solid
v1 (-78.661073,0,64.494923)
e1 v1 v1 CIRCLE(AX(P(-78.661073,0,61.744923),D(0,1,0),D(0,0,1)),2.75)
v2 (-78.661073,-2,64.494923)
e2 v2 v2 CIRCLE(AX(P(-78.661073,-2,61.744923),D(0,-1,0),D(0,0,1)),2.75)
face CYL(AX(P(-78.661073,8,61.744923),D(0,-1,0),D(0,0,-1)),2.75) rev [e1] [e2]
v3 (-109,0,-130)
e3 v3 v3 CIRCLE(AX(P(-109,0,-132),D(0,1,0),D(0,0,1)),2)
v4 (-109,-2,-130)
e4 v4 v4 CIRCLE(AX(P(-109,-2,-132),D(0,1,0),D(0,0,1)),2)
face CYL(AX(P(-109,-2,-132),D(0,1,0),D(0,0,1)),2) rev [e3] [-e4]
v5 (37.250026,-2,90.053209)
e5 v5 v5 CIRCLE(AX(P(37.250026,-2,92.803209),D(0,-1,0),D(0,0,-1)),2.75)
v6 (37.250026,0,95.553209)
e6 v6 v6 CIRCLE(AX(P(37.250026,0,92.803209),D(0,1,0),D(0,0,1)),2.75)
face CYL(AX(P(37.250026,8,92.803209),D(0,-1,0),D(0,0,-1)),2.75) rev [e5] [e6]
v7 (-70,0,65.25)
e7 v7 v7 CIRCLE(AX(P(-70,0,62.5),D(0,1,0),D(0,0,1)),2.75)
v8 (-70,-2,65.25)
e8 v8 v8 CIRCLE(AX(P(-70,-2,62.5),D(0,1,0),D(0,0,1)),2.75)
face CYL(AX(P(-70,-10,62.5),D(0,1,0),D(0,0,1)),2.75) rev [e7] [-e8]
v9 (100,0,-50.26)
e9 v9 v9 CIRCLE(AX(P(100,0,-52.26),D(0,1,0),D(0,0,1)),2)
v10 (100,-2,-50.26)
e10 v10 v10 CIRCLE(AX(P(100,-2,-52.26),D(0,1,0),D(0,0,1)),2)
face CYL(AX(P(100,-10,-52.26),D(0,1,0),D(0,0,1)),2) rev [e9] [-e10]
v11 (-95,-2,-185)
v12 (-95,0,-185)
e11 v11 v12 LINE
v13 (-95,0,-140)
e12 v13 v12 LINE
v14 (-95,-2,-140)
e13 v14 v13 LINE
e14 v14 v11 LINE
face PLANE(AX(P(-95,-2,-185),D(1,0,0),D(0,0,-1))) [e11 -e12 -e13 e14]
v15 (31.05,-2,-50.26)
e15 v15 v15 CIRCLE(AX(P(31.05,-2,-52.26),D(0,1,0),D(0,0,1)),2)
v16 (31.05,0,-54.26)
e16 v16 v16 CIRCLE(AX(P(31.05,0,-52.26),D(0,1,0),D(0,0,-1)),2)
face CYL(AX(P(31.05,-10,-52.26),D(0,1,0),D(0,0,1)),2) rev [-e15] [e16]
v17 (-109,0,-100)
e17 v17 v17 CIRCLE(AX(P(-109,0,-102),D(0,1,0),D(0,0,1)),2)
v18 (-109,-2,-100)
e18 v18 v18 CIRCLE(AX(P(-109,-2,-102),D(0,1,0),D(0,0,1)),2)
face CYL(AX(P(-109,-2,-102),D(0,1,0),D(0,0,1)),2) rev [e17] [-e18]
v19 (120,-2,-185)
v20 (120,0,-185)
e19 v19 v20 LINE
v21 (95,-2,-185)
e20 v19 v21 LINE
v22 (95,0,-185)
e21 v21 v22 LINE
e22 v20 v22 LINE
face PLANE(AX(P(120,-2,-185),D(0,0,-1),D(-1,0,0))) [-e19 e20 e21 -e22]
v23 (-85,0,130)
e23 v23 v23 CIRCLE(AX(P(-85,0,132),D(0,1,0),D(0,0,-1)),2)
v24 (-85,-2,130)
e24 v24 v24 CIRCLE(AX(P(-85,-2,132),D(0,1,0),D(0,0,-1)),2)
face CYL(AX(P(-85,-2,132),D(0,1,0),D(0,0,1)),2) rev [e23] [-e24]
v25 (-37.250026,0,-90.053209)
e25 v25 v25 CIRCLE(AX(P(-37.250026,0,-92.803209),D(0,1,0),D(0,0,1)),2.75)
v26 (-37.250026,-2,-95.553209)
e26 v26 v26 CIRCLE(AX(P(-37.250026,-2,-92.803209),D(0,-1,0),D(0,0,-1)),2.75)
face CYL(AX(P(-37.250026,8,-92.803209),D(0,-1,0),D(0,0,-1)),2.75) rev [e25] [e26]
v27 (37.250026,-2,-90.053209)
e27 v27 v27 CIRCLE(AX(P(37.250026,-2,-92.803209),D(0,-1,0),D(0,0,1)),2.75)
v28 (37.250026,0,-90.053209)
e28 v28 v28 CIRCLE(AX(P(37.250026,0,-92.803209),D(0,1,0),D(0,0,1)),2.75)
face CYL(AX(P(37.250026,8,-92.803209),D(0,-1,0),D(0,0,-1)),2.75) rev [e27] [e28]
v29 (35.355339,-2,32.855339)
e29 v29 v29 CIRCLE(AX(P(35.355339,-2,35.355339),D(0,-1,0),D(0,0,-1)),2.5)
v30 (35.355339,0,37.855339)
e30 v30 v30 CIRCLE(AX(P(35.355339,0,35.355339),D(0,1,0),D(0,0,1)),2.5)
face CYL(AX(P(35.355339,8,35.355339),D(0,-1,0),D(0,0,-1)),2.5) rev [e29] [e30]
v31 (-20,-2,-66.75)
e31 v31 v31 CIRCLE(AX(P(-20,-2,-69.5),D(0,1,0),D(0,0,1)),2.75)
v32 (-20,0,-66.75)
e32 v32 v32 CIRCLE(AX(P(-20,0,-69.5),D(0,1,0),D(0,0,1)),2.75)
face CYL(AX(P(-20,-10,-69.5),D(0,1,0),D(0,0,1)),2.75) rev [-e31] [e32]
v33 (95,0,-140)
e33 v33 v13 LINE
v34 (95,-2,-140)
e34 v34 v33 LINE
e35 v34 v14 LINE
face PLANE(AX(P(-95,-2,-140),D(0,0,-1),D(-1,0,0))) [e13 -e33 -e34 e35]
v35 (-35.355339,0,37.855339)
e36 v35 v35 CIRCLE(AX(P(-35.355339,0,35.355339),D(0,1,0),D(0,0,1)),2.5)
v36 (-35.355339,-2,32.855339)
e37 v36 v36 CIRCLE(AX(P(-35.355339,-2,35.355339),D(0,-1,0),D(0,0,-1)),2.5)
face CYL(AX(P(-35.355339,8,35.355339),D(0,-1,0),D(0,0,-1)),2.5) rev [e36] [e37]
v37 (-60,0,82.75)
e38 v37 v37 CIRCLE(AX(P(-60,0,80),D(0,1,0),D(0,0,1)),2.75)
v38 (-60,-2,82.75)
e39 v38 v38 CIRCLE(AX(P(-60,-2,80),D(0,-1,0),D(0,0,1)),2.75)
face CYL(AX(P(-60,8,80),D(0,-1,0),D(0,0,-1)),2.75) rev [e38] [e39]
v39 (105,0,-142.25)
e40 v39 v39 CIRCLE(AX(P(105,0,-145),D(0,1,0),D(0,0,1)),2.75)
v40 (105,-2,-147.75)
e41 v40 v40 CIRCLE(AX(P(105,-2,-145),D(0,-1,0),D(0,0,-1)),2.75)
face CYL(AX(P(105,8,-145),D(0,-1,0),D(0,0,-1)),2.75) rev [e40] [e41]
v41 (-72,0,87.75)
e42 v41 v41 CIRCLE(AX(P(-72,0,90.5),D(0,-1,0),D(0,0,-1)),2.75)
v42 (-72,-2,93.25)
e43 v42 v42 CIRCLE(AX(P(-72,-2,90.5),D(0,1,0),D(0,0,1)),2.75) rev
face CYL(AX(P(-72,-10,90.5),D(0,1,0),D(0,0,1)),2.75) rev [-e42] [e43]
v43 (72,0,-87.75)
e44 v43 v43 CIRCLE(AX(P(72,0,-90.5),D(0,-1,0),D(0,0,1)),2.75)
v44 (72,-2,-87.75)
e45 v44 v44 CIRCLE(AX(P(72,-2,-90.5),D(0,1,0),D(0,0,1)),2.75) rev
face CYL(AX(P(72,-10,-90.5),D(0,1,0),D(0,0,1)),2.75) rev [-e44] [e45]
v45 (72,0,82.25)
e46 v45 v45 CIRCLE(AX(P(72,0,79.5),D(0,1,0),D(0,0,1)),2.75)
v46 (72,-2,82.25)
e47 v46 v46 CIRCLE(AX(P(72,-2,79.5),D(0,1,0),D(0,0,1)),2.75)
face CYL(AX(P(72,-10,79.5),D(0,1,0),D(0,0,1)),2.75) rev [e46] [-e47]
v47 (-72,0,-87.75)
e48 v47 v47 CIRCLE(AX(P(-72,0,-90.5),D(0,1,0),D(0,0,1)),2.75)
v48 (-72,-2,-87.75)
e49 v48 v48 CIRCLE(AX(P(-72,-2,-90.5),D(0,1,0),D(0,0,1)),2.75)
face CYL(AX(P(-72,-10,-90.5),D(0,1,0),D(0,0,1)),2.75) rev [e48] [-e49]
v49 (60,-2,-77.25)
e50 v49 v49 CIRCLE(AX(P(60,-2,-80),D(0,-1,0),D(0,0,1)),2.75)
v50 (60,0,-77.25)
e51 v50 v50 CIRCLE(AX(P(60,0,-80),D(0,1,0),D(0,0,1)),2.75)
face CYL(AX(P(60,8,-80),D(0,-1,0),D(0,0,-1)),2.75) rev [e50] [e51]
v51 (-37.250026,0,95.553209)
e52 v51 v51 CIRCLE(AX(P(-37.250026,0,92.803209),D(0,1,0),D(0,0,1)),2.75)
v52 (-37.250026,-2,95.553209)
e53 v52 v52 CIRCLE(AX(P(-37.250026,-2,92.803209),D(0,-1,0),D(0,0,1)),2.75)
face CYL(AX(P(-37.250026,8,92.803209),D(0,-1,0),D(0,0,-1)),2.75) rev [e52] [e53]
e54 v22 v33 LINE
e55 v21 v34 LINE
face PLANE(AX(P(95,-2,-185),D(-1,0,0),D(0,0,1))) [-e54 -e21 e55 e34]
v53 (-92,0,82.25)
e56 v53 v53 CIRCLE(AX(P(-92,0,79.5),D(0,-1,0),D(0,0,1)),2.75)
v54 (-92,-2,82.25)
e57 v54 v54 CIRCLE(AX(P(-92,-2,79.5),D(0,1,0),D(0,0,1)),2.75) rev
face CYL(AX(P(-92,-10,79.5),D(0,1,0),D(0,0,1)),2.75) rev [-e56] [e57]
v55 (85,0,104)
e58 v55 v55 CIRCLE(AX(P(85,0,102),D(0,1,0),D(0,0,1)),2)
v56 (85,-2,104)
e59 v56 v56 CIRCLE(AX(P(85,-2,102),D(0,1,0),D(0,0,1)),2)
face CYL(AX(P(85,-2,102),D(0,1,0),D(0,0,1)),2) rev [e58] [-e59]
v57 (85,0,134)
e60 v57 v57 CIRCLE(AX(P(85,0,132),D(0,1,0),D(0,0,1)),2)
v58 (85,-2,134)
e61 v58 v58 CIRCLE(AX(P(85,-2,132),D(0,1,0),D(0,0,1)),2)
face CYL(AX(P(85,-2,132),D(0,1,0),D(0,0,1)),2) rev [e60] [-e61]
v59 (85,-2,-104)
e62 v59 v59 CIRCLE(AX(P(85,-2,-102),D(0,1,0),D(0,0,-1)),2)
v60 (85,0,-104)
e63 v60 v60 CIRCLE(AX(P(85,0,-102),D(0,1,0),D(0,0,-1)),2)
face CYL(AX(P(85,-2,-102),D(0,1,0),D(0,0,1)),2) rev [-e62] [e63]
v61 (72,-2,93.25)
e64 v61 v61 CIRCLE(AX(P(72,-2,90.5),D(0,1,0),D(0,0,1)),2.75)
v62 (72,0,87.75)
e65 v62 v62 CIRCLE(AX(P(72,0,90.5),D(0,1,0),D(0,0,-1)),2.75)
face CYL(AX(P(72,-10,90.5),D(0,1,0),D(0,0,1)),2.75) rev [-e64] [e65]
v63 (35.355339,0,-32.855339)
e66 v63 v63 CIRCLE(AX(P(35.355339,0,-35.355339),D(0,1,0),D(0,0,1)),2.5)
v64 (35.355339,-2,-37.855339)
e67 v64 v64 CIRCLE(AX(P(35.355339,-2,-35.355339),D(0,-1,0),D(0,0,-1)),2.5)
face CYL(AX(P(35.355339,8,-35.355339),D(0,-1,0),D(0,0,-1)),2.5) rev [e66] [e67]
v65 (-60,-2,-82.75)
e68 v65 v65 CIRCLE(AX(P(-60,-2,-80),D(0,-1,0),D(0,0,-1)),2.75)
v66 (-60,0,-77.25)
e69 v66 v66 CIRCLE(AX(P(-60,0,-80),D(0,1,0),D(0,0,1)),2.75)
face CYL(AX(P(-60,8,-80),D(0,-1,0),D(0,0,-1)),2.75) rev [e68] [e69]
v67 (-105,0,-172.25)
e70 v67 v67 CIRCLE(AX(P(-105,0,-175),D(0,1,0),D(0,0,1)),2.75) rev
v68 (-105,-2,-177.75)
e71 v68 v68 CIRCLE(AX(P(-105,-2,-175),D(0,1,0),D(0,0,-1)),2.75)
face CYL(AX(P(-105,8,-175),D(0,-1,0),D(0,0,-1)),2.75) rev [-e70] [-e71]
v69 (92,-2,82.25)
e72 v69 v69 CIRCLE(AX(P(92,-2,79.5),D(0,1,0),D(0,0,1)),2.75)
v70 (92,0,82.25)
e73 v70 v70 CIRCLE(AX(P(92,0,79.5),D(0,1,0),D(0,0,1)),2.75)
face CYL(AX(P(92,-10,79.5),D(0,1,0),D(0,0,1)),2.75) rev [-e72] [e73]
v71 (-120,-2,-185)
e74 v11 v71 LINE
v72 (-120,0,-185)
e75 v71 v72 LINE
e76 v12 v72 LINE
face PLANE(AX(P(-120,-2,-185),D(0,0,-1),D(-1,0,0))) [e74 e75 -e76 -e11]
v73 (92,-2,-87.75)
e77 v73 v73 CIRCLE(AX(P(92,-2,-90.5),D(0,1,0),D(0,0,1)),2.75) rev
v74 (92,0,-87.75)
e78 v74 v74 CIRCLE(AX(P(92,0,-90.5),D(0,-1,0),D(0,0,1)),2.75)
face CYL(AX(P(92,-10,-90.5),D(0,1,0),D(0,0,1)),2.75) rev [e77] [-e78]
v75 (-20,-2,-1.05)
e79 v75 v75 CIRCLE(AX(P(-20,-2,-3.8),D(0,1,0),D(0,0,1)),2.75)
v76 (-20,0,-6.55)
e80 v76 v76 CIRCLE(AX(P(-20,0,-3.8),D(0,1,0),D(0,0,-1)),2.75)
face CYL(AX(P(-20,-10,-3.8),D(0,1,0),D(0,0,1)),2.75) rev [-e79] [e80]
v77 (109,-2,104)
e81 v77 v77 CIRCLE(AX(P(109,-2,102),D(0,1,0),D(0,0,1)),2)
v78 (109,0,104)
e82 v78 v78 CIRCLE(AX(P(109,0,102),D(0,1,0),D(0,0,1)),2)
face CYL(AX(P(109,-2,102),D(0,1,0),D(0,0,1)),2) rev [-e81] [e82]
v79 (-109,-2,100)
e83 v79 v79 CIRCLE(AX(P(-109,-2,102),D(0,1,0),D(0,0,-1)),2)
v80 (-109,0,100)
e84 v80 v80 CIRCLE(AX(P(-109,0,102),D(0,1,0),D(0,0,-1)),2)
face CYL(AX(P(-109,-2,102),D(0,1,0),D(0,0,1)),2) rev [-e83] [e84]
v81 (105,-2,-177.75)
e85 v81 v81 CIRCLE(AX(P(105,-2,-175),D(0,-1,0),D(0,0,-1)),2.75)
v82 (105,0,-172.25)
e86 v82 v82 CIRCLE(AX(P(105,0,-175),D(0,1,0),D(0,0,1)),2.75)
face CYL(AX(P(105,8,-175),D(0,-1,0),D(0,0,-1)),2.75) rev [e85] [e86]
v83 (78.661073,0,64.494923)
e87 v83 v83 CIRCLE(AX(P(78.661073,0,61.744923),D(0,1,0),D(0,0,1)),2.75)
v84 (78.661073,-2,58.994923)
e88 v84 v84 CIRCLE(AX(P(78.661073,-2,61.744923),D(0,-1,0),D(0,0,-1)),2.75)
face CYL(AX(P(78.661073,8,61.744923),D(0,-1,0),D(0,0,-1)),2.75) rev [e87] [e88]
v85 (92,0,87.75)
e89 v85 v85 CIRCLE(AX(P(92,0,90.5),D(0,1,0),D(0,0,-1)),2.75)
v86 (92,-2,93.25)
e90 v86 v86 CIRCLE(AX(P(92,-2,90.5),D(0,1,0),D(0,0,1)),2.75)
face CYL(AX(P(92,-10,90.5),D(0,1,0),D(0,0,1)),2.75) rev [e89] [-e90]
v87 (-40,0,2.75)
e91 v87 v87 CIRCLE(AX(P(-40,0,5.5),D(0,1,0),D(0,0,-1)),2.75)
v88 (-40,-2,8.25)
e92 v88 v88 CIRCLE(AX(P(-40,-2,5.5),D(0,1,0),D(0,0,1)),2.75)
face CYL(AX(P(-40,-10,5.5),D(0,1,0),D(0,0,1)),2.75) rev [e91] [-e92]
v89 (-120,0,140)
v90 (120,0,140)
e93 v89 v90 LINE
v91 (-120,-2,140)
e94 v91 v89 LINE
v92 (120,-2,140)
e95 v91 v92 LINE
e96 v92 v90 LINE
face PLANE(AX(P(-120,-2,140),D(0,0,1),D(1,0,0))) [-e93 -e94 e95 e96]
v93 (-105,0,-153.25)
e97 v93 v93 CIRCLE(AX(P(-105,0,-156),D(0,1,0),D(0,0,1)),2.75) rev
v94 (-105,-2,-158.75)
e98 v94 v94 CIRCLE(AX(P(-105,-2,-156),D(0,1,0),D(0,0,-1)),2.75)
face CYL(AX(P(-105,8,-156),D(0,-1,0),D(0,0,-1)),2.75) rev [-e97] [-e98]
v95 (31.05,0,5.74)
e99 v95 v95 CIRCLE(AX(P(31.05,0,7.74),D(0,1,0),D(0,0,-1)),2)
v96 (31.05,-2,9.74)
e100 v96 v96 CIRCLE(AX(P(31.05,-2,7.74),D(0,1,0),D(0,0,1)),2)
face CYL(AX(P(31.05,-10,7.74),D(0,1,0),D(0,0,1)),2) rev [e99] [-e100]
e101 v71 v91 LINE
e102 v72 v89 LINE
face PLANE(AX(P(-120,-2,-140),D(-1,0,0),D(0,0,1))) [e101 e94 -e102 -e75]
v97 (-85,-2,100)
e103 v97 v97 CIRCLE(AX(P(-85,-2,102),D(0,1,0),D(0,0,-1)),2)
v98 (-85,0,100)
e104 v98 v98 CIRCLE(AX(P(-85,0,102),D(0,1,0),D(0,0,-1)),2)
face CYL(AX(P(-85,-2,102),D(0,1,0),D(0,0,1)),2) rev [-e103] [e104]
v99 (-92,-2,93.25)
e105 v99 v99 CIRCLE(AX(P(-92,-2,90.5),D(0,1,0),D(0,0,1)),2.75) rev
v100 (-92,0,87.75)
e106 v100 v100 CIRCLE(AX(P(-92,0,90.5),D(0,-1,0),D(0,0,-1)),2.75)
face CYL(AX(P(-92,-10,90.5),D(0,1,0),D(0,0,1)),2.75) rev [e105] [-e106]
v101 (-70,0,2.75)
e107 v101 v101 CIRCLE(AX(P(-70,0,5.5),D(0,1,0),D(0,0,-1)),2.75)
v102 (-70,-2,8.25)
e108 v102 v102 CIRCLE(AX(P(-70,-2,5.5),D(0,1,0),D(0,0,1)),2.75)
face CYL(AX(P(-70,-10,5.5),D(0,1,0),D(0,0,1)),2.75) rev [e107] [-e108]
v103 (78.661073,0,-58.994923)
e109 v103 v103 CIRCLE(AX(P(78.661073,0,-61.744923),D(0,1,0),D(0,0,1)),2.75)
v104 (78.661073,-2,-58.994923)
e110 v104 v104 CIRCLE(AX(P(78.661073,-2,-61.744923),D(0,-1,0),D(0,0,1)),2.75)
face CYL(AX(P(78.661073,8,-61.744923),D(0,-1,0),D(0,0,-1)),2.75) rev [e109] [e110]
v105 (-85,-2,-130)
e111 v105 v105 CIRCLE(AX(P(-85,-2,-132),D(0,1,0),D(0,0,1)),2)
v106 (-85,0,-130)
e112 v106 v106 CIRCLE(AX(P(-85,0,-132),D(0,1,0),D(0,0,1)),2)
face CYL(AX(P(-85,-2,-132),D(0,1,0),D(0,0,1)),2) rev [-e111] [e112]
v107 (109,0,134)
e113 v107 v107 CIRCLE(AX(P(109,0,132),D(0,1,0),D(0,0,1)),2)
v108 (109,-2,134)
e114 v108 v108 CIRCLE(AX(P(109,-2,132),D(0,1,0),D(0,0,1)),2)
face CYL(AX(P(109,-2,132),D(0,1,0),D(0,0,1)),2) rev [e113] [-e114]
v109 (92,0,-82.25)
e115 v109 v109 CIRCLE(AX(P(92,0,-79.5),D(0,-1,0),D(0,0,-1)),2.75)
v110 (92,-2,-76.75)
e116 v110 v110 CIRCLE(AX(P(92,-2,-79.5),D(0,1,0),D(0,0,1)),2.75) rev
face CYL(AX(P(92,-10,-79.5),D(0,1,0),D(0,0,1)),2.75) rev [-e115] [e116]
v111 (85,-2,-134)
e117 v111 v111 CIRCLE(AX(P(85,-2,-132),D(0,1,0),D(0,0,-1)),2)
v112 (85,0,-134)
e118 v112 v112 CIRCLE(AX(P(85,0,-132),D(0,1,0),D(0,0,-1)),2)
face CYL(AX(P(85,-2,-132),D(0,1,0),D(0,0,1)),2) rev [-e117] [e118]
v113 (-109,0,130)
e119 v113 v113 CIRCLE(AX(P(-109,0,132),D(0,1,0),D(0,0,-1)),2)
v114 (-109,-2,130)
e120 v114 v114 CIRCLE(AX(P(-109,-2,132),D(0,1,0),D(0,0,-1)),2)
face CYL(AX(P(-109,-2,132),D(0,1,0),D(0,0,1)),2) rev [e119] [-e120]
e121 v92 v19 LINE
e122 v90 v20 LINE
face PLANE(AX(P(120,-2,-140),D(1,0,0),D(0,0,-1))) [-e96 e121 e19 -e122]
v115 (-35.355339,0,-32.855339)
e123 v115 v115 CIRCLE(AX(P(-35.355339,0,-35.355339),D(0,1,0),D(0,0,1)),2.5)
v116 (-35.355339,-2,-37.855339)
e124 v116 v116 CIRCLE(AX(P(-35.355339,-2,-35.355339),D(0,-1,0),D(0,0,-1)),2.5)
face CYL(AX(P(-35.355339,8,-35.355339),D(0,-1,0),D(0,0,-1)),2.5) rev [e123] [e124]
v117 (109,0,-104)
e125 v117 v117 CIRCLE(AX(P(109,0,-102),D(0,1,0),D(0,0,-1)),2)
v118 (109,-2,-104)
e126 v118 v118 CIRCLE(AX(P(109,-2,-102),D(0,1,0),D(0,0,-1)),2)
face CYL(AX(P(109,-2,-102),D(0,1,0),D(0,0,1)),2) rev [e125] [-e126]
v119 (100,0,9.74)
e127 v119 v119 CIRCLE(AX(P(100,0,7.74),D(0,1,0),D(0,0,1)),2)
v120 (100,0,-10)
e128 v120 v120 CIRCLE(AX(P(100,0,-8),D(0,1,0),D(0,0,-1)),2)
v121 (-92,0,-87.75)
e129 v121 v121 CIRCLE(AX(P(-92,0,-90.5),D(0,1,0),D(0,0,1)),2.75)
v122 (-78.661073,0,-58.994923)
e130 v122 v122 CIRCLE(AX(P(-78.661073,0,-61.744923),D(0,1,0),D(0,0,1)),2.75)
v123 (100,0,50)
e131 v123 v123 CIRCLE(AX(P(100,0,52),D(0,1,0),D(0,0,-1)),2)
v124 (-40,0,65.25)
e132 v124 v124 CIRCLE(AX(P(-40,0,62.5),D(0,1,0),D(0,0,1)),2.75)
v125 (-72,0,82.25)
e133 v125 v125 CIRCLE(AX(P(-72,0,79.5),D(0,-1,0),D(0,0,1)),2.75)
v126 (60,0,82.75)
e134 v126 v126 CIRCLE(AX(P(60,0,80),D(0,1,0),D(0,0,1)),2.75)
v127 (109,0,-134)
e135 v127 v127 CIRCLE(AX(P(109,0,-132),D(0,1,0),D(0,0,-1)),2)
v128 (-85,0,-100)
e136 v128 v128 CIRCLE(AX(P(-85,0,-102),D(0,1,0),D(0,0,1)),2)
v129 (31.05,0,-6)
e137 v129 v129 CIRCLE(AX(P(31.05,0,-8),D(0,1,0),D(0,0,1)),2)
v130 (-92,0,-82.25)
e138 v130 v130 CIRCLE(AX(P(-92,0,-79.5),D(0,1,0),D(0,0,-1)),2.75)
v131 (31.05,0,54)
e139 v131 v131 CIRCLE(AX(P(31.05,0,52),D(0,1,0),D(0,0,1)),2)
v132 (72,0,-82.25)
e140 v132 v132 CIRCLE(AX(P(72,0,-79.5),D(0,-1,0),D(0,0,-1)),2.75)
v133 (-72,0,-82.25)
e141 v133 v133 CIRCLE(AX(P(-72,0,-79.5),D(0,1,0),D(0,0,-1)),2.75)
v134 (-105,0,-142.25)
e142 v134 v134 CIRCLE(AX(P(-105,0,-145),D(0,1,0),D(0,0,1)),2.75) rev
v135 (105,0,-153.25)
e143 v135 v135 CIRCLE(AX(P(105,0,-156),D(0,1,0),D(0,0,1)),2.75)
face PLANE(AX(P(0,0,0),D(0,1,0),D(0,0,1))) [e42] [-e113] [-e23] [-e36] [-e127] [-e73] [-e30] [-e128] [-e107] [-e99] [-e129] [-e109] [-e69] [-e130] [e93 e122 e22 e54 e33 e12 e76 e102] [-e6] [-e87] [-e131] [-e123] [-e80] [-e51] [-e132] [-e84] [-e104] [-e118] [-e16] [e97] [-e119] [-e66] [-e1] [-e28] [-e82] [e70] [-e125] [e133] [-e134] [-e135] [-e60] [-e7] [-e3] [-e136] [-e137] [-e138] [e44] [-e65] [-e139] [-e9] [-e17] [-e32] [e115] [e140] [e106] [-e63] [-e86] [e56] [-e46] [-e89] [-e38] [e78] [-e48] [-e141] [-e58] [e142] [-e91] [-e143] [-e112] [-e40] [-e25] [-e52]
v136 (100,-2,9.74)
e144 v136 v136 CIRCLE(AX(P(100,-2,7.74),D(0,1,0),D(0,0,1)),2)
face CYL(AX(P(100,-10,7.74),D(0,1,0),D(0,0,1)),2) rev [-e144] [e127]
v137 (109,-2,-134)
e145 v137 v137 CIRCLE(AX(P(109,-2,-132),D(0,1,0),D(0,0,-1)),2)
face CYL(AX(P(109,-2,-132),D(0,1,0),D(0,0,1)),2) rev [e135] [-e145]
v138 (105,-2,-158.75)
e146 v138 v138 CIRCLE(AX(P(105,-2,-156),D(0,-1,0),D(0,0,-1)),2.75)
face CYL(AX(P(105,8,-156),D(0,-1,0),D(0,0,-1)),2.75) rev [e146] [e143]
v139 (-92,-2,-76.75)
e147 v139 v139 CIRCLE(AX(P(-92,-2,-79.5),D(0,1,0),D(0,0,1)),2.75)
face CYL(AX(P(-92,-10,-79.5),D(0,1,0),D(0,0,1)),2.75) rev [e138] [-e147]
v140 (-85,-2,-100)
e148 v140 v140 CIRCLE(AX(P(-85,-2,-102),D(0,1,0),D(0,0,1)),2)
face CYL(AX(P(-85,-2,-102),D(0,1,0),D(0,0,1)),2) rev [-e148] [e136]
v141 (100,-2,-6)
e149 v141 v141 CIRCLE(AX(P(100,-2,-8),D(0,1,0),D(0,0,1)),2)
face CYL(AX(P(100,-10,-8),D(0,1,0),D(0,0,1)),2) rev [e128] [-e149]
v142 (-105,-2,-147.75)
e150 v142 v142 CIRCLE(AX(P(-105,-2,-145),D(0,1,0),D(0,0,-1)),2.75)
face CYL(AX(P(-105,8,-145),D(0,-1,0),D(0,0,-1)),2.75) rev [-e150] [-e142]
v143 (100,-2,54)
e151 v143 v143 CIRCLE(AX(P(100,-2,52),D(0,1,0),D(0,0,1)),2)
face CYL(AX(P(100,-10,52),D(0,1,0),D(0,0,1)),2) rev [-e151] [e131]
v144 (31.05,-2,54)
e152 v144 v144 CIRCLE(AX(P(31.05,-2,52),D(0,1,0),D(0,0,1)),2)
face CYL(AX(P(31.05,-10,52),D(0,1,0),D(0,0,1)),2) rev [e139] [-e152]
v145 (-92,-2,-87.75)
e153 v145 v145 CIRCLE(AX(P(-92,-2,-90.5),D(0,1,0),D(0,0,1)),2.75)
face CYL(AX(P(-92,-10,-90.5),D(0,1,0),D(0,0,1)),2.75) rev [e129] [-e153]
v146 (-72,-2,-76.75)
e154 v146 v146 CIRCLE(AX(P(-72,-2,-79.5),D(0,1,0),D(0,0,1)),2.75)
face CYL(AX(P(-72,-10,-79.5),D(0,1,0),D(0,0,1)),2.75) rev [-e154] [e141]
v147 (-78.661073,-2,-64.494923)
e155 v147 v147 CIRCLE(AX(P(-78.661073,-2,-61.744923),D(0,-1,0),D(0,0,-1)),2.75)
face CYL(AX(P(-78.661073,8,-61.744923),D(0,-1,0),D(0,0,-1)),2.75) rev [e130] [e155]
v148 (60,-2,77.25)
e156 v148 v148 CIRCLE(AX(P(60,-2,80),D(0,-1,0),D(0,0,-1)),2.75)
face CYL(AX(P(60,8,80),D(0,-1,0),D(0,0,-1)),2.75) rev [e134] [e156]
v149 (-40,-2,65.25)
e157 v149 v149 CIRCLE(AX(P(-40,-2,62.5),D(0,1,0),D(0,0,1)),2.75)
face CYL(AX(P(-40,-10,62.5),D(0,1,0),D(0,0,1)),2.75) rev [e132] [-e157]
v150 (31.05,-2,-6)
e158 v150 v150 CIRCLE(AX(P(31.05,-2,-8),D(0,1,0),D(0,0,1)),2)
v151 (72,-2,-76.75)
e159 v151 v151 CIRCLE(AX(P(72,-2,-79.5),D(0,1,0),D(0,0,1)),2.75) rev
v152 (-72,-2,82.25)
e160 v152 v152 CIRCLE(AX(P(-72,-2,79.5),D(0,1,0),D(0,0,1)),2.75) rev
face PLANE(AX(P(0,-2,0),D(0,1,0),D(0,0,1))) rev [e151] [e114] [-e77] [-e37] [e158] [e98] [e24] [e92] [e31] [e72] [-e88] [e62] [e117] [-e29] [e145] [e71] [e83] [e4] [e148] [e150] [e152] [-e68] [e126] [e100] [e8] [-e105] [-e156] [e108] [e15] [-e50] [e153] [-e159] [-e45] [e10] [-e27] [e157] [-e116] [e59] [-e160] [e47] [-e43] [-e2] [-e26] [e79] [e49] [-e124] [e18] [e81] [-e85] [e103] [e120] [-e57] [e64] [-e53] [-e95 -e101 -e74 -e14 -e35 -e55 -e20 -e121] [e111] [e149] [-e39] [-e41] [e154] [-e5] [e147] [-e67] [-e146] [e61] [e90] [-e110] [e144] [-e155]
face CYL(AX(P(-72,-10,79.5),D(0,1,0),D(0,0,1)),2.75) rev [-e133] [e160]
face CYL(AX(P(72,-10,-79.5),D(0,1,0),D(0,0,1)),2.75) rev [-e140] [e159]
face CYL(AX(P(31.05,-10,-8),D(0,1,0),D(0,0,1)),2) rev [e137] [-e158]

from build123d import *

# Parameters (mm, degrees)
SM_BASE_FLANGE_2_DEPTH   = 2
SKETCH_26_R              = 2
CUT_EXTRUDE_1_DEPTH      = 221.519840377
SKETCH_27_R              = 2.5
CUT_EXTRUDE_2_DEPTH      = 10
SKETCH_28_R              = 2.75
CUT_EXTRUDE_3_DEPTH      = 10
SKETCH_29_R              = 2.75
CUT_EXTRUDE_4_DEPTH      = 10
SKETCH_30_R              = 2.75
CUT_EXTRUDE_5_DEPTH      = 10
MIRROR_3_COPY_1_SKETCH_R = 2.75
MIRROR_3_COPY_1_DEPTH    = 10
SKETCH_31_R              = 2
CUT_EXTRUDE_6_DEPTH      = 10
PATTERN_LINEAR_1_COUNT   = 2
PATTERN_LINEAR_1_PITCH   = 60
SKETCH_32_R              = 2.75
CUT_EXTRUDE_7_DEPTH      = 10
SKETCH_33_R              = 2.75
CUT_EXTRUDE_8_DEPTH      = 10


# Sheet-metal steps are written as plain solids
with BuildPart() as part:
    # 草图2 → 基体-法兰2 (new body)
    with BuildSketch(Plane(origin=(0, 0, 0), x_dir=(1, 0, 0), z_dir=(0, 1, 0))):
        Polygon((-120, 140), (-120, 185), (-95, 185), (-95, 140), (95, 140), (95, 185), (120, 185), (120, 140), (120, -140), (-120, -140), align=None)
    extrude(amount=-SM_BASE_FLANGE_2_DEPTH)

    # 草图26 → 切除-拉伸1 (cut, through all)
    with BuildSketch(Plane(origin=(0, 0, 0), x_dir=(1, 0, 0), z_dir=(0, 1, 0))):
        with Locations(Location((-109, 102, 0), (0, 0, 270))):
            Circle(SKETCH_26_R)
        with Locations(Location((-109, 132, 0), (0, 0, 270))):
            Circle(SKETCH_26_R)
        with Locations(Location((-85, 132, 0), (0, 0, 270))):
            Circle(SKETCH_26_R)
        with Locations(Location((-85, 102, 0), (0, 0, 270))):
            Circle(SKETCH_26_R)
        with Locations(Location((-85, -102, 0), (0, 0, 90))):
            Circle(SKETCH_26_R)
        with Locations(Location((-85, -132, 0), (0, 0, 90))):
            Circle(SKETCH_26_R)
        with Locations(Location((-109, -132, 0), (0, 0, 90))):
            Circle(SKETCH_26_R)
        with Locations(Location((-109, -102, 0), (0, 0, 90))):
            Circle(SKETCH_26_R)
        with Locations(Location((85, 102, 0), (0, 0, 90))):
            Circle(SKETCH_26_R)
        with Locations(Location((85, 132, 0), (0, 0, 90))):
            Circle(SKETCH_26_R)
        with Locations(Location((109, 132, 0), (0, 0, 90))):
            Circle(SKETCH_26_R)
        with Locations(Location((109, 102, 0), (0, 0, 90))):
            Circle(SKETCH_26_R)
        with Locations(Location((109, -102, 0), (0, 0, 270))):
            Circle(SKETCH_26_R)
        with Locations(Location((109, -132, 0), (0, 0, 270))):
            Circle(SKETCH_26_R)
        with Locations(Location((85, -132, 0), (0, 0, 270))):
            Circle(SKETCH_26_R)
        with Locations(Location((85, -102, 0), (0, 0, 270))):
            Circle(SKETCH_26_R)
    extrude(amount=-CUT_EXTRUDE_1_DEPTH, mode=Mode.SUBTRACT)

    # 草图27 → 切除-拉伸2 (cut)
    with BuildSketch(Plane.XZ.offset(2)):
        with Locations(Location((-35.355339059, 35.355339059, 0), (0, 0, 270))):
            Circle(SKETCH_27_R)
        with Locations(Location((35.355339059, 35.355339059, 0), (0, 0, 270))):
            Circle(SKETCH_27_R)
        with Locations(Location((35.355339059, -35.355339059, 0), (0, 0, 270))):
            Circle(SKETCH_27_R)
        with Locations(Location((-35.355339059, -35.355339059, 0), (0, 0, 270))):
            Circle(SKETCH_27_R)
    extrude(amount=-CUT_EXTRUDE_2_DEPTH, mode=Mode.SUBTRACT)

    # 草图28 → 切除-拉伸3 (cut)
    with BuildSketch(Plane.XZ.offset(2)):
        with Locations(Location((-60, -80, 0), (0, 0, 270))):
            Circle(SKETCH_28_R)
        with Locations(Location((-37.250025969, -92.803208809, 0), (0, 0, 270))):
            Circle(SKETCH_28_R)
        with Locations(Location((-78.661073186, -61.744923397, 0), (0, 0, 270))):
            Circle(SKETCH_28_R)
        with Locations(Location((78.661073186, -61.744923397, 0), (0, 0, 90))):
            Circle(SKETCH_28_R)
        with Locations(Location((37.250025969, -92.803208809, 0), (0, 0, 90))):
            Circle(SKETCH_28_R)
        with Locations(Location((60, -80, 0), (0, 0, 90))):
            Circle(SKETCH_28_R)
        with Locations(Location((-78.661073186, 61.744923397, 0), (0, 0, 90))):
            Circle(SKETCH_28_R)
        with Locations(Location((-37.250025969, 92.803208809, 0), (0, 0, 90))):
            Circle(SKETCH_28_R)
        with Locations(Location((-60, 80, 0), (0, 0, 90))):
            Circle(SKETCH_28_R)
        with Locations(Location((60, 80, 0), (0, 0, 270))):
            Circle(SKETCH_28_R)
        with Locations(Location((37.250025969, 92.803208809, 0), (0, 0, 270))):
            Circle(SKETCH_28_R)
        with Locations(Location((78.661073186, 61.744923397, 0), (0, 0, 270))):
            Circle(SKETCH_28_R)
    extrude(amount=-CUT_EXTRUDE_3_DEPTH, mode=Mode.SUBTRACT)

    # 草图29 → 切除-拉伸4 (cut)
    with BuildSketch(Plane.XZ.offset(2)):
        with Locations(Location((105, -175, 0), (0, 0, 270))):
            Circle(SKETCH_29_R)
        with Locations(Location((105, -156, 0), (0, 0, 270))):
            Circle(SKETCH_29_R)
        with Locations(Location((105, -145, 0), (0, 0, 270))):
            Circle(SKETCH_29_R)
    cut_extrude_4 = extrude(amount=-CUT_EXTRUDE_4_DEPTH, mode=Mode.SUBTRACT)

    # 镜向1: 切除-拉伸4 across plane
    add(cut_extrude_4.mirror(Plane(origin=(0, 0, 0), x_dir=(0, 0, 1), z_dir=(1, 0, 0))), mode=Mode.SUBTRACT)

    # 草图30 → 切除-拉伸5 (cut)
    with BuildSketch(Plane(origin=(0, 0, 0), x_dir=(1, 0, 0), z_dir=(0, 1, 0))):
        with Locations(Location((-92, 90.5, 0), (0, 0, 270))):
            Circle(SKETCH_30_R)
        with Locations(Location((-92, 79.5, 0), (0, 0, 270))):
            Circle(SKETCH_30_R)
        with Locations(Location((-72, 79.5, 0), (0, 0, 270))):
            Circle(SKETCH_30_R)
        with Locations(Location((-72, 90.5, 0), (0, 0, 270))):
            Circle(SKETCH_30_R)
    cut_extrude_5 = extrude(amount=-CUT_EXTRUDE_5_DEPTH, mode=Mode.SUBTRACT)

    # 镜向2: 切除-拉伸5 across plane
    add(cut_extrude_5.mirror(Plane.XY), mode=Mode.SUBTRACT)

    # 镜向3: 切除-拉伸5 across plane
    add(cut_extrude_5.mirror(Plane(origin=(0, 0, 0), x_dir=(0, 0, 1), z_dir=(1, 0, 0))), mode=Mode.SUBTRACT)

    # 镜向3 copy 1 sketch → 镜向3 copy 1 (cut)
    with BuildSketch(Plane(origin=(0, 0, 0), x_dir=(-1, 0, 0), z_dir=(0, 1, 0))):
        with Locations(Location((-92, 90.5, 0), (0, 0, 270))):
            Circle(MIRROR_3_COPY_1_SKETCH_R)
        with Locations(Location((-92, 79.5, 0), (0, 0, 270))):
            Circle(MIRROR_3_COPY_1_SKETCH_R)
        with Locations(Location((-72, 79.5, 0), (0, 0, 270))):
            Circle(MIRROR_3_COPY_1_SKETCH_R)
        with Locations(Location((-72, 90.5, 0), (0, 0, 270))):
            Circle(MIRROR_3_COPY_1_SKETCH_R)
    extrude(amount=-MIRROR_3_COPY_1_DEPTH, mode=Mode.SUBTRACT)

    # 草图31 → 切除-拉伸6 (cut)
    with BuildSketch(Plane(origin=(0, 0, 0), x_dir=(1, 0, 0), z_dir=(0, 1, 0))):
        with Locations(Location((31.05, -52, 0), (0, 0, 270))):
            Circle(SKETCH_31_R)
        with Locations(Location((31.05, -7.74, 0), (0, 0, 270))):
            Circle(SKETCH_31_R)
        with Locations(Location((100, -7.74, 0), (0, 0, 270))):
            Circle(SKETCH_31_R)
        with Locations(Location((100, -52, 0), (0, 0, 270))):
            Circle(SKETCH_31_R)
    cut_extrude_6 = extrude(amount=-CUT_EXTRUDE_6_DEPTH, mode=Mode.SUBTRACT)

    # 阵列(线性)1: 切除-拉伸6 ×2
    with Locations(*[(0, 0, -i * PATTERN_LINEAR_1_PITCH) for i in range(1, PATTERN_LINEAR_1_COUNT)]):
        add(cut_extrude_6, mode=Mode.SUBTRACT)

    # 草图32 → 切除-拉伸7 (cut)
    with BuildSketch(Plane(origin=(0, 0, 0), x_dir=(1, 0, 0), z_dir=(0, 1, 0))):
        with Locations(Location((-20, 69.5, 0), (0, 0, 270))):
            Circle(SKETCH_32_R)
        with Locations(Location((-20, 3.8, 0), (0, 0, 270))):
            Circle(SKETCH_32_R)
    extrude(amount=-CUT_EXTRUDE_7_DEPTH, mode=Mode.SUBTRACT)

    # 草图33 → 切除-拉伸8 (cut)
    with BuildSketch(Plane(origin=(0, 0, 0), x_dir=(1, 0, 0), z_dir=(0, 1, 0))):
        with Locations(Location((-70, -62.5, 0), (0, 0, 270))):
            Circle(SKETCH_33_R)
        with Locations(Location((-70, -5.5, 0), (0, 0, 270))):
            Circle(SKETCH_33_R)
        with Locations(Location((-40, -5.5, 0), (0, 0, 270))):
            Circle(SKETCH_33_R)
        with Locations(Location((-40, -62.5, 0), (0, 0, 270))):
            Circle(SKETCH_33_R)
    extrude(amount=-CUT_EXTRUDE_8_DEPTH, mode=Mode.SUBTRACT)


solid = part.part
